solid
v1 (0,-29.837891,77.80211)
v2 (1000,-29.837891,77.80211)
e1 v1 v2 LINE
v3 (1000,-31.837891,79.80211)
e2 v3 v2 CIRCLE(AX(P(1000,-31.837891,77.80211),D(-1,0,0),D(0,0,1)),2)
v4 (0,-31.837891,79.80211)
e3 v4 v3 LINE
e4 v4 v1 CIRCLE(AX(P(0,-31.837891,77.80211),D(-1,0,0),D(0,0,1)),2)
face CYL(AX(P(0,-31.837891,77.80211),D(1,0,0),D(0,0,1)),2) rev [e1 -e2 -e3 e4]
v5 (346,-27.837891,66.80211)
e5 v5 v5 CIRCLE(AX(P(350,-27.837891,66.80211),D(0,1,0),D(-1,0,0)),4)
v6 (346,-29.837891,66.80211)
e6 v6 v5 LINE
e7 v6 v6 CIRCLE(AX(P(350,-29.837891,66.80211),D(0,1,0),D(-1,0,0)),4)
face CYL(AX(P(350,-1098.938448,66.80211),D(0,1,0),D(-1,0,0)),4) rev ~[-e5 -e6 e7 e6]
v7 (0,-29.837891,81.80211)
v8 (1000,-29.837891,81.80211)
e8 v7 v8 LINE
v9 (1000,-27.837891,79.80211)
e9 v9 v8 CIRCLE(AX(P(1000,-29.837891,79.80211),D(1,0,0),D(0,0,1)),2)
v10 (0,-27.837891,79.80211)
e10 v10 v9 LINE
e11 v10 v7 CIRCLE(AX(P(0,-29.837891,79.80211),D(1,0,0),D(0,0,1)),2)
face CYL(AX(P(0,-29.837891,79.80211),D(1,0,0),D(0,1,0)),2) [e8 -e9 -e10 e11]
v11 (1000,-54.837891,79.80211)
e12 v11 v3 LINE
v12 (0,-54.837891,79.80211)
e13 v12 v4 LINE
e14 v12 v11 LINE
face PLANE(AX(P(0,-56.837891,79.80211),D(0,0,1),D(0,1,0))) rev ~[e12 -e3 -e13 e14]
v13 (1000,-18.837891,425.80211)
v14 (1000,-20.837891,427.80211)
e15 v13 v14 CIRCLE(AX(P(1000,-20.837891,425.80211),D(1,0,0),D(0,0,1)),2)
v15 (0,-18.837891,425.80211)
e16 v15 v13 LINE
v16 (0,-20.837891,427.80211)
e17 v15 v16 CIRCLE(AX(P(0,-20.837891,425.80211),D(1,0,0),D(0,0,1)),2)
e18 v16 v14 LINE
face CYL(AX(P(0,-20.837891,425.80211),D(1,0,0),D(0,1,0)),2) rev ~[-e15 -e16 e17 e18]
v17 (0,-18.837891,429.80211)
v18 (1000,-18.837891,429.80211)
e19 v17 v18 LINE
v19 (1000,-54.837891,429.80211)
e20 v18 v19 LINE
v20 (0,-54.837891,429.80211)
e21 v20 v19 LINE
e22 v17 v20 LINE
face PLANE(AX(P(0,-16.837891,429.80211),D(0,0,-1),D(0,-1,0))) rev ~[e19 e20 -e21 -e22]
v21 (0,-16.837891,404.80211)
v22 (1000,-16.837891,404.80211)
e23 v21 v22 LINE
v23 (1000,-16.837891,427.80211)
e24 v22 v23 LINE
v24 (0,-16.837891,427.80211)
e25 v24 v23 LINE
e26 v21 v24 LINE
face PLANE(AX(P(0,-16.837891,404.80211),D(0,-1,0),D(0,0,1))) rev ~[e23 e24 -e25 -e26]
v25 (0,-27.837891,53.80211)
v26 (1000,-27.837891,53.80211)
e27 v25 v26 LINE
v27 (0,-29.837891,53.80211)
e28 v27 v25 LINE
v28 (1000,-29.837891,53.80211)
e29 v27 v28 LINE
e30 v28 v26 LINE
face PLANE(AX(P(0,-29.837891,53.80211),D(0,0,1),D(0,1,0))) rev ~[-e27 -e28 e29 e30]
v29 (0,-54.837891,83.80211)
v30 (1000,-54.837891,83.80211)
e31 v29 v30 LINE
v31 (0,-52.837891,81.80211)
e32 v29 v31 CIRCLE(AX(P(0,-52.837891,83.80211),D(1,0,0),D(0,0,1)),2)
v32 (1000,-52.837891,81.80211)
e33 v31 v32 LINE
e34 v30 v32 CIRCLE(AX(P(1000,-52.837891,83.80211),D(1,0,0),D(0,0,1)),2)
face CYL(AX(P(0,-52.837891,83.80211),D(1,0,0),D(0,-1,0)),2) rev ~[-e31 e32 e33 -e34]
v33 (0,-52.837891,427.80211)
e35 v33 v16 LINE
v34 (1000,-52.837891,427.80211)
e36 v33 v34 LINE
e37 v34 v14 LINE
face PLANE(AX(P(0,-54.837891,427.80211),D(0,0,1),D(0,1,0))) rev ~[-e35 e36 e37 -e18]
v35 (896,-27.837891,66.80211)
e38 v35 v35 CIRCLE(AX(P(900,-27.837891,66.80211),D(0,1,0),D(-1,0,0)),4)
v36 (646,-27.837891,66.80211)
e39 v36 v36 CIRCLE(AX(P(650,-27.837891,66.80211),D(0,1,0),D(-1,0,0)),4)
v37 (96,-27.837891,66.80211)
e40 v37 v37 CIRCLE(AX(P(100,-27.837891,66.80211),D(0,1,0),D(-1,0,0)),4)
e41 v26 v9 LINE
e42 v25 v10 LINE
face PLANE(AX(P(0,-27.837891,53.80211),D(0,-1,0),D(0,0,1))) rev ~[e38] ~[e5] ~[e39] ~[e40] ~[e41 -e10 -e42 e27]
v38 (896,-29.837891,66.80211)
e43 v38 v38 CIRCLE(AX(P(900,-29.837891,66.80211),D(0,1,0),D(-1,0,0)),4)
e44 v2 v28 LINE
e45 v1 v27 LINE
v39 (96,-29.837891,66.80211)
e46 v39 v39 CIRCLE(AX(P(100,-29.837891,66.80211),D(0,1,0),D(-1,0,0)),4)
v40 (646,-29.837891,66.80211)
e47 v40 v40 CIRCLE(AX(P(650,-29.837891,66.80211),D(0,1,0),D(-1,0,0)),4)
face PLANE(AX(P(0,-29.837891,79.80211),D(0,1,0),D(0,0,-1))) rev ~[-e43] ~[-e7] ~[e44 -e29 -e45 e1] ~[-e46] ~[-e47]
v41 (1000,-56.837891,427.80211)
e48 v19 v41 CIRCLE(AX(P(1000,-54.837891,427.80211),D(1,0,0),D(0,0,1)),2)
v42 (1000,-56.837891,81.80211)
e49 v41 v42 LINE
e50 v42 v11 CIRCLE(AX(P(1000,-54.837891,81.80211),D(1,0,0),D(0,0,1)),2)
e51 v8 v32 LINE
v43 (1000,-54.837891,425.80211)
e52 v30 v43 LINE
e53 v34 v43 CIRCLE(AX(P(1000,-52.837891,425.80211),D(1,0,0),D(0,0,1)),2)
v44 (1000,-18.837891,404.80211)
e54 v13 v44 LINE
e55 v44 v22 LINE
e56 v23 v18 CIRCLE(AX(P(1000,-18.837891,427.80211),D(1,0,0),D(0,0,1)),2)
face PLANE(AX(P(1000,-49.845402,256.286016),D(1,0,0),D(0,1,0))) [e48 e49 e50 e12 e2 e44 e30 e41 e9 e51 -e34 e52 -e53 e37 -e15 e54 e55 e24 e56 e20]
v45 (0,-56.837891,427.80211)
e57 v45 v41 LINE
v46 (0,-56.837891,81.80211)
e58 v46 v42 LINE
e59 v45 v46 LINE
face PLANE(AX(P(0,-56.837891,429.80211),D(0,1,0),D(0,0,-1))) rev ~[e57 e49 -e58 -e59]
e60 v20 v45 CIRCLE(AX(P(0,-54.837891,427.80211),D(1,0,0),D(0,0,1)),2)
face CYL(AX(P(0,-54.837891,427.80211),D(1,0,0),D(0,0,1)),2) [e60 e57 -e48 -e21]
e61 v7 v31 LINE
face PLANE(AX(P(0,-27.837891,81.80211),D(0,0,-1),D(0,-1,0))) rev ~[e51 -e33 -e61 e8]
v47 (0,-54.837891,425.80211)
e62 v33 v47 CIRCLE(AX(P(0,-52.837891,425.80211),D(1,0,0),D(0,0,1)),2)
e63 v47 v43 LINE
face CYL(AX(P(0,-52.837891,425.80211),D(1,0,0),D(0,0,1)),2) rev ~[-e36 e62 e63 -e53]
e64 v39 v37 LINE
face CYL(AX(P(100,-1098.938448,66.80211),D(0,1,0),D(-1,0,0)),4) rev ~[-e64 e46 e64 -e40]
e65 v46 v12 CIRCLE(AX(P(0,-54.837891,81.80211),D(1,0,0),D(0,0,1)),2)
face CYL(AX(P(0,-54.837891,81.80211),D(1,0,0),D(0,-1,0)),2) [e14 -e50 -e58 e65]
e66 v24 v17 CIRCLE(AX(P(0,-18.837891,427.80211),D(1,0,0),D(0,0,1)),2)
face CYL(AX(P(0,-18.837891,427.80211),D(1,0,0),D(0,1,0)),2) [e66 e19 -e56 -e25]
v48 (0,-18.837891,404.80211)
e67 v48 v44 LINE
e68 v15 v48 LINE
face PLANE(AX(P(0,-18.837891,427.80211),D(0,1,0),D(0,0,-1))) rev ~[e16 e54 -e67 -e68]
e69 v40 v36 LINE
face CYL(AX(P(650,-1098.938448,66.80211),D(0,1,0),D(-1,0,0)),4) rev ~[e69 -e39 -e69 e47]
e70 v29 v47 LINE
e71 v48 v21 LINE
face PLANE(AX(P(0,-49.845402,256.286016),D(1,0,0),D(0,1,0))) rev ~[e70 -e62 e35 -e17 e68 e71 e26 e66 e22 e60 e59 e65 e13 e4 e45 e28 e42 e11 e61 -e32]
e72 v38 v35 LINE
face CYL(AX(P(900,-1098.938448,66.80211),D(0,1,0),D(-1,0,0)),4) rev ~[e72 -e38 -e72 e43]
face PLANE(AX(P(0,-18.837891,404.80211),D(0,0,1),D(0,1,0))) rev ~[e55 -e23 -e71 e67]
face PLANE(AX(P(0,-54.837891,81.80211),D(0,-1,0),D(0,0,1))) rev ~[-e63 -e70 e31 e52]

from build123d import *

# Parameters (mm, degrees)
F1_DEPTH = 1000
F3_D     = 8
F4_R     = 2


# Not quite as in the source:
# - a feature names something its author has since deleted; it is built from what else it names


with BuildPart() as f1:
    # F0 (on Right) → F1 (new body)
    with BuildSketch(Plane.YZ):
        Polygon((-18.8378913403, 427.8021101952), (-18.8378913403, 404.8021101952), (-16.8378913403, 404.8021101952), (-16.8378913403, 429.8021101952), (-56.8378913403, 429.8021101952), (-56.8378913403, 79.8021101952), (-29.8378913403, 79.8021101952), (-29.8378913403, 53.8021101952), (-27.8378913403, 53.8021101952), (-27.8378913403, 81.8021101952), (-54.8378913403, 81.8021101952), (-54.8378913403, 427.8021101952), align=None)
    extrude(amount=F1_DEPTH)

    # F3 (through all)
    with Locations(Plane.XZ.offset(29.8378913403)):
        with Locations((350, 66.8021101952), (650, 66.8021101952), (900, 66.8021101952), (100, 66.8021101952)):
            Hole(F3_D / 2)

    # F4
    f4_edges = [f1.edges().sort_by_distance(p)[0] for p in [
        (500, -56.837891, 429.80211),
        (500, -16.837891, 429.80211),
        (500, -56.837891, 79.80211),
        (500, -27.837891, 81.80211),
        (500, -54.837891, 81.80211),
        (500, -29.837891, 79.80211),
        (500, -18.837891, 427.80211),
        (500, -54.837891, 427.80211),
    ]]
    fillet(f4_edges, radius=F4_R)


solid = f1.part
